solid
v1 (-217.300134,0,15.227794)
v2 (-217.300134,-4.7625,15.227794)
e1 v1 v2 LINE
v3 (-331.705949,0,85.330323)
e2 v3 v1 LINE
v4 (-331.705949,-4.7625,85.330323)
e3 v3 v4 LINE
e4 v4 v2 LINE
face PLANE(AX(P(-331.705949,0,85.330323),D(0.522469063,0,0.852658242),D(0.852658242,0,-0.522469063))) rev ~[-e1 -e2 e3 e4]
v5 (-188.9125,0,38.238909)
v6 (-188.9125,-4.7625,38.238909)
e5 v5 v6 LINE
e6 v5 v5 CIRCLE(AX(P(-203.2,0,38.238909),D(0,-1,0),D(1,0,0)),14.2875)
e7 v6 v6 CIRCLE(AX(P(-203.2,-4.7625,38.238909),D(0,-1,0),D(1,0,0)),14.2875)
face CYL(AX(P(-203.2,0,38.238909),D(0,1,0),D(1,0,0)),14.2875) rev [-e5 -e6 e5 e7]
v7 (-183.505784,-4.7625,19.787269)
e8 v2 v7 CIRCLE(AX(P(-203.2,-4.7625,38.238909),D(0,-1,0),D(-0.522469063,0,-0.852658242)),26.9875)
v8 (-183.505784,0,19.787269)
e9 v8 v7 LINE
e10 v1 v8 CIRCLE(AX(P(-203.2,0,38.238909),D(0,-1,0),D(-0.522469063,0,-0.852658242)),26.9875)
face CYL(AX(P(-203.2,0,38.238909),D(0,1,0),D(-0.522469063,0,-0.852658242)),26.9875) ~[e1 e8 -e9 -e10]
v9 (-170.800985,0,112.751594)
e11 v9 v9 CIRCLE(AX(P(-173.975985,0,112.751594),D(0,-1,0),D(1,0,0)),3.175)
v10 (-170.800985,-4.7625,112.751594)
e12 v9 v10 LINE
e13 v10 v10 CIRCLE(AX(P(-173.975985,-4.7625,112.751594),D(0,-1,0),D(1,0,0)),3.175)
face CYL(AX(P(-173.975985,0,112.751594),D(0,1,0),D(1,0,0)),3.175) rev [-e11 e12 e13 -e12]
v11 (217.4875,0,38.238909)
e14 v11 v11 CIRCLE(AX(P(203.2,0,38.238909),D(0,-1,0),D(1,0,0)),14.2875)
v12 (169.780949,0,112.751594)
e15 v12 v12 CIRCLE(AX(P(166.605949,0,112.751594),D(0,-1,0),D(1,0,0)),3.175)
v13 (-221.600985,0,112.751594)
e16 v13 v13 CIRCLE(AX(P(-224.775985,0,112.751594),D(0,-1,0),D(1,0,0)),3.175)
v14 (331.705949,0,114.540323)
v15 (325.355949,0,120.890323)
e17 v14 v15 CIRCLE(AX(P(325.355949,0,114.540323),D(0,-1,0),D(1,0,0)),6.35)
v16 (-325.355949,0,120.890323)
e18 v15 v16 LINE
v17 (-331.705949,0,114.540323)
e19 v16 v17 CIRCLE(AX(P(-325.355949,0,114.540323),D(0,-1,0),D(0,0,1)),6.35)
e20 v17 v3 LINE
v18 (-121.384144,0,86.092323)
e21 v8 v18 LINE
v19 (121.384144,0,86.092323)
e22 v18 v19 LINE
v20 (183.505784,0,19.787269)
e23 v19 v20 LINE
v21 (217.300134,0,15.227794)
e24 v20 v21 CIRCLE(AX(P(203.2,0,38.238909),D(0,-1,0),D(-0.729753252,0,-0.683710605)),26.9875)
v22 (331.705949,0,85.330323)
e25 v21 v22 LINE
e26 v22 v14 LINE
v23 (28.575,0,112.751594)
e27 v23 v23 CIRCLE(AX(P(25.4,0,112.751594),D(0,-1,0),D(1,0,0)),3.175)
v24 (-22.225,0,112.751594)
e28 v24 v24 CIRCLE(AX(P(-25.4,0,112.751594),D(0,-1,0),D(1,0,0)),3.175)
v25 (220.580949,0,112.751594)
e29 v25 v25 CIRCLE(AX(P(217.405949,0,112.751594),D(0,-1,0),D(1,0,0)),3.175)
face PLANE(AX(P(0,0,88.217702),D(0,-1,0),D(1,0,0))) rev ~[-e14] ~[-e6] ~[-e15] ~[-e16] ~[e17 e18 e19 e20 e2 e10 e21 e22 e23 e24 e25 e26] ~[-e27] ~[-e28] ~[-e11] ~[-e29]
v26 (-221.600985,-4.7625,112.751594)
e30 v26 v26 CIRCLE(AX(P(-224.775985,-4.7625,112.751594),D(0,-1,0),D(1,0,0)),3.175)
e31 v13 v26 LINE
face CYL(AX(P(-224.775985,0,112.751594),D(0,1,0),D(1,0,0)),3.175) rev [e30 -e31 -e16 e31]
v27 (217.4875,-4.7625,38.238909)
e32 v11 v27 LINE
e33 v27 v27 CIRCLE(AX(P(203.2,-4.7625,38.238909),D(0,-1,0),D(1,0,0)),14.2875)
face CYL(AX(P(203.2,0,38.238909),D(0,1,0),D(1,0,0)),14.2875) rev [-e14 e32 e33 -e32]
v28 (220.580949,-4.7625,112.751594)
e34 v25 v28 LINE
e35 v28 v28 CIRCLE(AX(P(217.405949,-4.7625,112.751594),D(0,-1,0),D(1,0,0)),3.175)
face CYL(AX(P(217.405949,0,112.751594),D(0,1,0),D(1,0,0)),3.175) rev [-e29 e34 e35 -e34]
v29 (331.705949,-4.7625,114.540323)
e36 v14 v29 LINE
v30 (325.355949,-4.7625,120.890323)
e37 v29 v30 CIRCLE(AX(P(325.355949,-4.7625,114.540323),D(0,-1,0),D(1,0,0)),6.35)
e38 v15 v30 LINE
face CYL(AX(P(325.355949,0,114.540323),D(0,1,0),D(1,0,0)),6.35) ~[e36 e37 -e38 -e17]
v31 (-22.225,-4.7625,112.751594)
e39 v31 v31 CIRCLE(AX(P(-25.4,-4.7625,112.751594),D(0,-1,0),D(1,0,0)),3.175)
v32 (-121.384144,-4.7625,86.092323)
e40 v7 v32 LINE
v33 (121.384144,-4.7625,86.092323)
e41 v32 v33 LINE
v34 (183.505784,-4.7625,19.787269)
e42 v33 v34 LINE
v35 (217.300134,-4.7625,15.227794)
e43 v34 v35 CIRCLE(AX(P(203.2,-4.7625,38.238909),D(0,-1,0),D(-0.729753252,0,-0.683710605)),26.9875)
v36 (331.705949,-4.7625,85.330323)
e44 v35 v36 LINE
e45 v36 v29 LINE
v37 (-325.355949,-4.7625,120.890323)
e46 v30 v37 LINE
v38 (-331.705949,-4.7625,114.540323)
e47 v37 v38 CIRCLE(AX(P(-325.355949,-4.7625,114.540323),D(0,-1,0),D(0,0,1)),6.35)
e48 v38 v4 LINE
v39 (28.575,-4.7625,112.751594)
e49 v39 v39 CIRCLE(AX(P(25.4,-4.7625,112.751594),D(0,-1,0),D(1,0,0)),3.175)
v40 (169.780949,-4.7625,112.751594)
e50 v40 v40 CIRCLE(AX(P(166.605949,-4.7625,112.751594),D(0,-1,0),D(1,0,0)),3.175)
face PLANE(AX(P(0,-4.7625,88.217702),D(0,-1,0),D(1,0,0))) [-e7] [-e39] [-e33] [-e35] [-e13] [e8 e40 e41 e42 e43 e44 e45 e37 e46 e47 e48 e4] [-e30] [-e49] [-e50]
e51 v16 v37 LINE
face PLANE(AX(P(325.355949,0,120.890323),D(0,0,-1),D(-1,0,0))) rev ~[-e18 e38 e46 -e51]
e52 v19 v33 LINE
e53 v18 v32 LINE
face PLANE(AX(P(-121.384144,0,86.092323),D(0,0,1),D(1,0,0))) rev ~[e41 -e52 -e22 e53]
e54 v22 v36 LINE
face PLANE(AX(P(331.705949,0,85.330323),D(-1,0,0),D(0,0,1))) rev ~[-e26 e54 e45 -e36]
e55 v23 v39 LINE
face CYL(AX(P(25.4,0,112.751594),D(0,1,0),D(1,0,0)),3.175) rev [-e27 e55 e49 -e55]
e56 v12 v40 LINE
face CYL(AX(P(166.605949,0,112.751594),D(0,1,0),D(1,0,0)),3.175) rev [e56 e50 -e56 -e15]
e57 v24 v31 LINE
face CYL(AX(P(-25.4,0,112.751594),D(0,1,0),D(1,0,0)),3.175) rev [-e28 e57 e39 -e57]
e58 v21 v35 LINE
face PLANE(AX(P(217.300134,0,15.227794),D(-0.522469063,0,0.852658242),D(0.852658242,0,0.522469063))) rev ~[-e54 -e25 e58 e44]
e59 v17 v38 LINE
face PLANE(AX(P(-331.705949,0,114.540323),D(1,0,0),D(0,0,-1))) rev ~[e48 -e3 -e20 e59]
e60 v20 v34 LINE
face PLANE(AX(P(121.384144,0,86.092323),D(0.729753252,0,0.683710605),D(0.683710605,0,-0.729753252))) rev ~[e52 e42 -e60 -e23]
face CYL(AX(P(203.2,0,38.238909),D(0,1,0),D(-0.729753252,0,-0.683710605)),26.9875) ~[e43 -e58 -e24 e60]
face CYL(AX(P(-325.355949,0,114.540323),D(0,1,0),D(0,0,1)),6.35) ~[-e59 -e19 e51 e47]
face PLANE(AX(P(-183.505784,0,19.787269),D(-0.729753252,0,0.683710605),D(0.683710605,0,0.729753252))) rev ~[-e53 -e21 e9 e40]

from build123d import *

# Parameters (mm, degrees)
F0_R     = 14.2875
F0_R_2   = 3.175
F1_DEPTH = 4.7625


# Not quite as in the source:
# - a feature names something its author has since deleted; it is built from what else it names


with BuildPart() as f1:
    # F0 (on Front) → F1 (new body)
    with BuildSketch(Plane.XZ):
        with BuildLine():
            Line((217.3001338382, 15.2277942336), (331.7059490892, 85.3303231618))
            Line((331.7059490892, 85.3303231618), (331.7059490892, 114.5403231618))
            ThreePointArc((331.7059490892, 114.5403231618), (329.8460771498, 119.0304512224), (325.3559490892, 120.8903231618))
            Line((325.3559490892, 120.8903231618), (0, 120.8903231618))
            Line((0, 120.8903231618), (-325.3559490892, 120.8903231618))
            ThreePointArc((-325.3559490892, 120.8903231618), (-329.8460771498, 119.0304512224), (-331.7059490892, 114.5403231618))
            Line((-331.7059490892, 114.5403231618), (-331.7059490892, 85.3303231618))
            Line((-331.7059490892, 85.3303231618), (-217.3001338382, 15.2277942336))
            ThreePointArc((-217.3001338382, 15.2277942336), (-199.5915875984, 11.4937311101), (-183.5057841229, 19.7872685874))
            Line((-183.5057841229, 19.7872685874), (-121.3841438293, 86.0923231618))
            Line((-121.3841438293, 86.0923231618), (0, 86.0923231618))
            Line((0, 86.0923231618), (121.3841438293, 86.0923231618))
            Line((121.3841438293, 86.0923231618), (183.5057841229, 19.7872685874))
            ThreePointArc((183.5057841229, 19.7872685874), (199.5915875984, 11.4937311101), (217.3001338382, 15.2277942336))
        make_face()
        with Locations((-203.2, 38.2389085481)):
            Circle(F0_R, mode=Mode.SUBTRACT)
        with Locations((203.2, 38.2389085481)):
            Circle(F0_R, mode=Mode.SUBTRACT)
        with Locations((-224.77598496, 112.7515938063)):
            Circle(F0_R_2, mode=Mode.SUBTRACT)
        with Locations((-173.97598496, 112.7515938063)):
            Circle(F0_R_2, mode=Mode.SUBTRACT)
        with Locations((-25.4, 112.7515938063)):
            Circle(F0_R_2, mode=Mode.SUBTRACT)
        with Locations((25.4, 112.7515938063)):
            Circle(F0_R_2, mode=Mode.SUBTRACT)
        with Locations((166.6059490892, 112.7515938063)):
            Circle(F0_R_2, mode=Mode.SUBTRACT)
        with Locations((217.4059490892, 112.7515938063)):
            Circle(F0_R_2, mode=Mode.SUBTRACT)
    extrude(amount=F1_DEPTH)


solid = f1.part
